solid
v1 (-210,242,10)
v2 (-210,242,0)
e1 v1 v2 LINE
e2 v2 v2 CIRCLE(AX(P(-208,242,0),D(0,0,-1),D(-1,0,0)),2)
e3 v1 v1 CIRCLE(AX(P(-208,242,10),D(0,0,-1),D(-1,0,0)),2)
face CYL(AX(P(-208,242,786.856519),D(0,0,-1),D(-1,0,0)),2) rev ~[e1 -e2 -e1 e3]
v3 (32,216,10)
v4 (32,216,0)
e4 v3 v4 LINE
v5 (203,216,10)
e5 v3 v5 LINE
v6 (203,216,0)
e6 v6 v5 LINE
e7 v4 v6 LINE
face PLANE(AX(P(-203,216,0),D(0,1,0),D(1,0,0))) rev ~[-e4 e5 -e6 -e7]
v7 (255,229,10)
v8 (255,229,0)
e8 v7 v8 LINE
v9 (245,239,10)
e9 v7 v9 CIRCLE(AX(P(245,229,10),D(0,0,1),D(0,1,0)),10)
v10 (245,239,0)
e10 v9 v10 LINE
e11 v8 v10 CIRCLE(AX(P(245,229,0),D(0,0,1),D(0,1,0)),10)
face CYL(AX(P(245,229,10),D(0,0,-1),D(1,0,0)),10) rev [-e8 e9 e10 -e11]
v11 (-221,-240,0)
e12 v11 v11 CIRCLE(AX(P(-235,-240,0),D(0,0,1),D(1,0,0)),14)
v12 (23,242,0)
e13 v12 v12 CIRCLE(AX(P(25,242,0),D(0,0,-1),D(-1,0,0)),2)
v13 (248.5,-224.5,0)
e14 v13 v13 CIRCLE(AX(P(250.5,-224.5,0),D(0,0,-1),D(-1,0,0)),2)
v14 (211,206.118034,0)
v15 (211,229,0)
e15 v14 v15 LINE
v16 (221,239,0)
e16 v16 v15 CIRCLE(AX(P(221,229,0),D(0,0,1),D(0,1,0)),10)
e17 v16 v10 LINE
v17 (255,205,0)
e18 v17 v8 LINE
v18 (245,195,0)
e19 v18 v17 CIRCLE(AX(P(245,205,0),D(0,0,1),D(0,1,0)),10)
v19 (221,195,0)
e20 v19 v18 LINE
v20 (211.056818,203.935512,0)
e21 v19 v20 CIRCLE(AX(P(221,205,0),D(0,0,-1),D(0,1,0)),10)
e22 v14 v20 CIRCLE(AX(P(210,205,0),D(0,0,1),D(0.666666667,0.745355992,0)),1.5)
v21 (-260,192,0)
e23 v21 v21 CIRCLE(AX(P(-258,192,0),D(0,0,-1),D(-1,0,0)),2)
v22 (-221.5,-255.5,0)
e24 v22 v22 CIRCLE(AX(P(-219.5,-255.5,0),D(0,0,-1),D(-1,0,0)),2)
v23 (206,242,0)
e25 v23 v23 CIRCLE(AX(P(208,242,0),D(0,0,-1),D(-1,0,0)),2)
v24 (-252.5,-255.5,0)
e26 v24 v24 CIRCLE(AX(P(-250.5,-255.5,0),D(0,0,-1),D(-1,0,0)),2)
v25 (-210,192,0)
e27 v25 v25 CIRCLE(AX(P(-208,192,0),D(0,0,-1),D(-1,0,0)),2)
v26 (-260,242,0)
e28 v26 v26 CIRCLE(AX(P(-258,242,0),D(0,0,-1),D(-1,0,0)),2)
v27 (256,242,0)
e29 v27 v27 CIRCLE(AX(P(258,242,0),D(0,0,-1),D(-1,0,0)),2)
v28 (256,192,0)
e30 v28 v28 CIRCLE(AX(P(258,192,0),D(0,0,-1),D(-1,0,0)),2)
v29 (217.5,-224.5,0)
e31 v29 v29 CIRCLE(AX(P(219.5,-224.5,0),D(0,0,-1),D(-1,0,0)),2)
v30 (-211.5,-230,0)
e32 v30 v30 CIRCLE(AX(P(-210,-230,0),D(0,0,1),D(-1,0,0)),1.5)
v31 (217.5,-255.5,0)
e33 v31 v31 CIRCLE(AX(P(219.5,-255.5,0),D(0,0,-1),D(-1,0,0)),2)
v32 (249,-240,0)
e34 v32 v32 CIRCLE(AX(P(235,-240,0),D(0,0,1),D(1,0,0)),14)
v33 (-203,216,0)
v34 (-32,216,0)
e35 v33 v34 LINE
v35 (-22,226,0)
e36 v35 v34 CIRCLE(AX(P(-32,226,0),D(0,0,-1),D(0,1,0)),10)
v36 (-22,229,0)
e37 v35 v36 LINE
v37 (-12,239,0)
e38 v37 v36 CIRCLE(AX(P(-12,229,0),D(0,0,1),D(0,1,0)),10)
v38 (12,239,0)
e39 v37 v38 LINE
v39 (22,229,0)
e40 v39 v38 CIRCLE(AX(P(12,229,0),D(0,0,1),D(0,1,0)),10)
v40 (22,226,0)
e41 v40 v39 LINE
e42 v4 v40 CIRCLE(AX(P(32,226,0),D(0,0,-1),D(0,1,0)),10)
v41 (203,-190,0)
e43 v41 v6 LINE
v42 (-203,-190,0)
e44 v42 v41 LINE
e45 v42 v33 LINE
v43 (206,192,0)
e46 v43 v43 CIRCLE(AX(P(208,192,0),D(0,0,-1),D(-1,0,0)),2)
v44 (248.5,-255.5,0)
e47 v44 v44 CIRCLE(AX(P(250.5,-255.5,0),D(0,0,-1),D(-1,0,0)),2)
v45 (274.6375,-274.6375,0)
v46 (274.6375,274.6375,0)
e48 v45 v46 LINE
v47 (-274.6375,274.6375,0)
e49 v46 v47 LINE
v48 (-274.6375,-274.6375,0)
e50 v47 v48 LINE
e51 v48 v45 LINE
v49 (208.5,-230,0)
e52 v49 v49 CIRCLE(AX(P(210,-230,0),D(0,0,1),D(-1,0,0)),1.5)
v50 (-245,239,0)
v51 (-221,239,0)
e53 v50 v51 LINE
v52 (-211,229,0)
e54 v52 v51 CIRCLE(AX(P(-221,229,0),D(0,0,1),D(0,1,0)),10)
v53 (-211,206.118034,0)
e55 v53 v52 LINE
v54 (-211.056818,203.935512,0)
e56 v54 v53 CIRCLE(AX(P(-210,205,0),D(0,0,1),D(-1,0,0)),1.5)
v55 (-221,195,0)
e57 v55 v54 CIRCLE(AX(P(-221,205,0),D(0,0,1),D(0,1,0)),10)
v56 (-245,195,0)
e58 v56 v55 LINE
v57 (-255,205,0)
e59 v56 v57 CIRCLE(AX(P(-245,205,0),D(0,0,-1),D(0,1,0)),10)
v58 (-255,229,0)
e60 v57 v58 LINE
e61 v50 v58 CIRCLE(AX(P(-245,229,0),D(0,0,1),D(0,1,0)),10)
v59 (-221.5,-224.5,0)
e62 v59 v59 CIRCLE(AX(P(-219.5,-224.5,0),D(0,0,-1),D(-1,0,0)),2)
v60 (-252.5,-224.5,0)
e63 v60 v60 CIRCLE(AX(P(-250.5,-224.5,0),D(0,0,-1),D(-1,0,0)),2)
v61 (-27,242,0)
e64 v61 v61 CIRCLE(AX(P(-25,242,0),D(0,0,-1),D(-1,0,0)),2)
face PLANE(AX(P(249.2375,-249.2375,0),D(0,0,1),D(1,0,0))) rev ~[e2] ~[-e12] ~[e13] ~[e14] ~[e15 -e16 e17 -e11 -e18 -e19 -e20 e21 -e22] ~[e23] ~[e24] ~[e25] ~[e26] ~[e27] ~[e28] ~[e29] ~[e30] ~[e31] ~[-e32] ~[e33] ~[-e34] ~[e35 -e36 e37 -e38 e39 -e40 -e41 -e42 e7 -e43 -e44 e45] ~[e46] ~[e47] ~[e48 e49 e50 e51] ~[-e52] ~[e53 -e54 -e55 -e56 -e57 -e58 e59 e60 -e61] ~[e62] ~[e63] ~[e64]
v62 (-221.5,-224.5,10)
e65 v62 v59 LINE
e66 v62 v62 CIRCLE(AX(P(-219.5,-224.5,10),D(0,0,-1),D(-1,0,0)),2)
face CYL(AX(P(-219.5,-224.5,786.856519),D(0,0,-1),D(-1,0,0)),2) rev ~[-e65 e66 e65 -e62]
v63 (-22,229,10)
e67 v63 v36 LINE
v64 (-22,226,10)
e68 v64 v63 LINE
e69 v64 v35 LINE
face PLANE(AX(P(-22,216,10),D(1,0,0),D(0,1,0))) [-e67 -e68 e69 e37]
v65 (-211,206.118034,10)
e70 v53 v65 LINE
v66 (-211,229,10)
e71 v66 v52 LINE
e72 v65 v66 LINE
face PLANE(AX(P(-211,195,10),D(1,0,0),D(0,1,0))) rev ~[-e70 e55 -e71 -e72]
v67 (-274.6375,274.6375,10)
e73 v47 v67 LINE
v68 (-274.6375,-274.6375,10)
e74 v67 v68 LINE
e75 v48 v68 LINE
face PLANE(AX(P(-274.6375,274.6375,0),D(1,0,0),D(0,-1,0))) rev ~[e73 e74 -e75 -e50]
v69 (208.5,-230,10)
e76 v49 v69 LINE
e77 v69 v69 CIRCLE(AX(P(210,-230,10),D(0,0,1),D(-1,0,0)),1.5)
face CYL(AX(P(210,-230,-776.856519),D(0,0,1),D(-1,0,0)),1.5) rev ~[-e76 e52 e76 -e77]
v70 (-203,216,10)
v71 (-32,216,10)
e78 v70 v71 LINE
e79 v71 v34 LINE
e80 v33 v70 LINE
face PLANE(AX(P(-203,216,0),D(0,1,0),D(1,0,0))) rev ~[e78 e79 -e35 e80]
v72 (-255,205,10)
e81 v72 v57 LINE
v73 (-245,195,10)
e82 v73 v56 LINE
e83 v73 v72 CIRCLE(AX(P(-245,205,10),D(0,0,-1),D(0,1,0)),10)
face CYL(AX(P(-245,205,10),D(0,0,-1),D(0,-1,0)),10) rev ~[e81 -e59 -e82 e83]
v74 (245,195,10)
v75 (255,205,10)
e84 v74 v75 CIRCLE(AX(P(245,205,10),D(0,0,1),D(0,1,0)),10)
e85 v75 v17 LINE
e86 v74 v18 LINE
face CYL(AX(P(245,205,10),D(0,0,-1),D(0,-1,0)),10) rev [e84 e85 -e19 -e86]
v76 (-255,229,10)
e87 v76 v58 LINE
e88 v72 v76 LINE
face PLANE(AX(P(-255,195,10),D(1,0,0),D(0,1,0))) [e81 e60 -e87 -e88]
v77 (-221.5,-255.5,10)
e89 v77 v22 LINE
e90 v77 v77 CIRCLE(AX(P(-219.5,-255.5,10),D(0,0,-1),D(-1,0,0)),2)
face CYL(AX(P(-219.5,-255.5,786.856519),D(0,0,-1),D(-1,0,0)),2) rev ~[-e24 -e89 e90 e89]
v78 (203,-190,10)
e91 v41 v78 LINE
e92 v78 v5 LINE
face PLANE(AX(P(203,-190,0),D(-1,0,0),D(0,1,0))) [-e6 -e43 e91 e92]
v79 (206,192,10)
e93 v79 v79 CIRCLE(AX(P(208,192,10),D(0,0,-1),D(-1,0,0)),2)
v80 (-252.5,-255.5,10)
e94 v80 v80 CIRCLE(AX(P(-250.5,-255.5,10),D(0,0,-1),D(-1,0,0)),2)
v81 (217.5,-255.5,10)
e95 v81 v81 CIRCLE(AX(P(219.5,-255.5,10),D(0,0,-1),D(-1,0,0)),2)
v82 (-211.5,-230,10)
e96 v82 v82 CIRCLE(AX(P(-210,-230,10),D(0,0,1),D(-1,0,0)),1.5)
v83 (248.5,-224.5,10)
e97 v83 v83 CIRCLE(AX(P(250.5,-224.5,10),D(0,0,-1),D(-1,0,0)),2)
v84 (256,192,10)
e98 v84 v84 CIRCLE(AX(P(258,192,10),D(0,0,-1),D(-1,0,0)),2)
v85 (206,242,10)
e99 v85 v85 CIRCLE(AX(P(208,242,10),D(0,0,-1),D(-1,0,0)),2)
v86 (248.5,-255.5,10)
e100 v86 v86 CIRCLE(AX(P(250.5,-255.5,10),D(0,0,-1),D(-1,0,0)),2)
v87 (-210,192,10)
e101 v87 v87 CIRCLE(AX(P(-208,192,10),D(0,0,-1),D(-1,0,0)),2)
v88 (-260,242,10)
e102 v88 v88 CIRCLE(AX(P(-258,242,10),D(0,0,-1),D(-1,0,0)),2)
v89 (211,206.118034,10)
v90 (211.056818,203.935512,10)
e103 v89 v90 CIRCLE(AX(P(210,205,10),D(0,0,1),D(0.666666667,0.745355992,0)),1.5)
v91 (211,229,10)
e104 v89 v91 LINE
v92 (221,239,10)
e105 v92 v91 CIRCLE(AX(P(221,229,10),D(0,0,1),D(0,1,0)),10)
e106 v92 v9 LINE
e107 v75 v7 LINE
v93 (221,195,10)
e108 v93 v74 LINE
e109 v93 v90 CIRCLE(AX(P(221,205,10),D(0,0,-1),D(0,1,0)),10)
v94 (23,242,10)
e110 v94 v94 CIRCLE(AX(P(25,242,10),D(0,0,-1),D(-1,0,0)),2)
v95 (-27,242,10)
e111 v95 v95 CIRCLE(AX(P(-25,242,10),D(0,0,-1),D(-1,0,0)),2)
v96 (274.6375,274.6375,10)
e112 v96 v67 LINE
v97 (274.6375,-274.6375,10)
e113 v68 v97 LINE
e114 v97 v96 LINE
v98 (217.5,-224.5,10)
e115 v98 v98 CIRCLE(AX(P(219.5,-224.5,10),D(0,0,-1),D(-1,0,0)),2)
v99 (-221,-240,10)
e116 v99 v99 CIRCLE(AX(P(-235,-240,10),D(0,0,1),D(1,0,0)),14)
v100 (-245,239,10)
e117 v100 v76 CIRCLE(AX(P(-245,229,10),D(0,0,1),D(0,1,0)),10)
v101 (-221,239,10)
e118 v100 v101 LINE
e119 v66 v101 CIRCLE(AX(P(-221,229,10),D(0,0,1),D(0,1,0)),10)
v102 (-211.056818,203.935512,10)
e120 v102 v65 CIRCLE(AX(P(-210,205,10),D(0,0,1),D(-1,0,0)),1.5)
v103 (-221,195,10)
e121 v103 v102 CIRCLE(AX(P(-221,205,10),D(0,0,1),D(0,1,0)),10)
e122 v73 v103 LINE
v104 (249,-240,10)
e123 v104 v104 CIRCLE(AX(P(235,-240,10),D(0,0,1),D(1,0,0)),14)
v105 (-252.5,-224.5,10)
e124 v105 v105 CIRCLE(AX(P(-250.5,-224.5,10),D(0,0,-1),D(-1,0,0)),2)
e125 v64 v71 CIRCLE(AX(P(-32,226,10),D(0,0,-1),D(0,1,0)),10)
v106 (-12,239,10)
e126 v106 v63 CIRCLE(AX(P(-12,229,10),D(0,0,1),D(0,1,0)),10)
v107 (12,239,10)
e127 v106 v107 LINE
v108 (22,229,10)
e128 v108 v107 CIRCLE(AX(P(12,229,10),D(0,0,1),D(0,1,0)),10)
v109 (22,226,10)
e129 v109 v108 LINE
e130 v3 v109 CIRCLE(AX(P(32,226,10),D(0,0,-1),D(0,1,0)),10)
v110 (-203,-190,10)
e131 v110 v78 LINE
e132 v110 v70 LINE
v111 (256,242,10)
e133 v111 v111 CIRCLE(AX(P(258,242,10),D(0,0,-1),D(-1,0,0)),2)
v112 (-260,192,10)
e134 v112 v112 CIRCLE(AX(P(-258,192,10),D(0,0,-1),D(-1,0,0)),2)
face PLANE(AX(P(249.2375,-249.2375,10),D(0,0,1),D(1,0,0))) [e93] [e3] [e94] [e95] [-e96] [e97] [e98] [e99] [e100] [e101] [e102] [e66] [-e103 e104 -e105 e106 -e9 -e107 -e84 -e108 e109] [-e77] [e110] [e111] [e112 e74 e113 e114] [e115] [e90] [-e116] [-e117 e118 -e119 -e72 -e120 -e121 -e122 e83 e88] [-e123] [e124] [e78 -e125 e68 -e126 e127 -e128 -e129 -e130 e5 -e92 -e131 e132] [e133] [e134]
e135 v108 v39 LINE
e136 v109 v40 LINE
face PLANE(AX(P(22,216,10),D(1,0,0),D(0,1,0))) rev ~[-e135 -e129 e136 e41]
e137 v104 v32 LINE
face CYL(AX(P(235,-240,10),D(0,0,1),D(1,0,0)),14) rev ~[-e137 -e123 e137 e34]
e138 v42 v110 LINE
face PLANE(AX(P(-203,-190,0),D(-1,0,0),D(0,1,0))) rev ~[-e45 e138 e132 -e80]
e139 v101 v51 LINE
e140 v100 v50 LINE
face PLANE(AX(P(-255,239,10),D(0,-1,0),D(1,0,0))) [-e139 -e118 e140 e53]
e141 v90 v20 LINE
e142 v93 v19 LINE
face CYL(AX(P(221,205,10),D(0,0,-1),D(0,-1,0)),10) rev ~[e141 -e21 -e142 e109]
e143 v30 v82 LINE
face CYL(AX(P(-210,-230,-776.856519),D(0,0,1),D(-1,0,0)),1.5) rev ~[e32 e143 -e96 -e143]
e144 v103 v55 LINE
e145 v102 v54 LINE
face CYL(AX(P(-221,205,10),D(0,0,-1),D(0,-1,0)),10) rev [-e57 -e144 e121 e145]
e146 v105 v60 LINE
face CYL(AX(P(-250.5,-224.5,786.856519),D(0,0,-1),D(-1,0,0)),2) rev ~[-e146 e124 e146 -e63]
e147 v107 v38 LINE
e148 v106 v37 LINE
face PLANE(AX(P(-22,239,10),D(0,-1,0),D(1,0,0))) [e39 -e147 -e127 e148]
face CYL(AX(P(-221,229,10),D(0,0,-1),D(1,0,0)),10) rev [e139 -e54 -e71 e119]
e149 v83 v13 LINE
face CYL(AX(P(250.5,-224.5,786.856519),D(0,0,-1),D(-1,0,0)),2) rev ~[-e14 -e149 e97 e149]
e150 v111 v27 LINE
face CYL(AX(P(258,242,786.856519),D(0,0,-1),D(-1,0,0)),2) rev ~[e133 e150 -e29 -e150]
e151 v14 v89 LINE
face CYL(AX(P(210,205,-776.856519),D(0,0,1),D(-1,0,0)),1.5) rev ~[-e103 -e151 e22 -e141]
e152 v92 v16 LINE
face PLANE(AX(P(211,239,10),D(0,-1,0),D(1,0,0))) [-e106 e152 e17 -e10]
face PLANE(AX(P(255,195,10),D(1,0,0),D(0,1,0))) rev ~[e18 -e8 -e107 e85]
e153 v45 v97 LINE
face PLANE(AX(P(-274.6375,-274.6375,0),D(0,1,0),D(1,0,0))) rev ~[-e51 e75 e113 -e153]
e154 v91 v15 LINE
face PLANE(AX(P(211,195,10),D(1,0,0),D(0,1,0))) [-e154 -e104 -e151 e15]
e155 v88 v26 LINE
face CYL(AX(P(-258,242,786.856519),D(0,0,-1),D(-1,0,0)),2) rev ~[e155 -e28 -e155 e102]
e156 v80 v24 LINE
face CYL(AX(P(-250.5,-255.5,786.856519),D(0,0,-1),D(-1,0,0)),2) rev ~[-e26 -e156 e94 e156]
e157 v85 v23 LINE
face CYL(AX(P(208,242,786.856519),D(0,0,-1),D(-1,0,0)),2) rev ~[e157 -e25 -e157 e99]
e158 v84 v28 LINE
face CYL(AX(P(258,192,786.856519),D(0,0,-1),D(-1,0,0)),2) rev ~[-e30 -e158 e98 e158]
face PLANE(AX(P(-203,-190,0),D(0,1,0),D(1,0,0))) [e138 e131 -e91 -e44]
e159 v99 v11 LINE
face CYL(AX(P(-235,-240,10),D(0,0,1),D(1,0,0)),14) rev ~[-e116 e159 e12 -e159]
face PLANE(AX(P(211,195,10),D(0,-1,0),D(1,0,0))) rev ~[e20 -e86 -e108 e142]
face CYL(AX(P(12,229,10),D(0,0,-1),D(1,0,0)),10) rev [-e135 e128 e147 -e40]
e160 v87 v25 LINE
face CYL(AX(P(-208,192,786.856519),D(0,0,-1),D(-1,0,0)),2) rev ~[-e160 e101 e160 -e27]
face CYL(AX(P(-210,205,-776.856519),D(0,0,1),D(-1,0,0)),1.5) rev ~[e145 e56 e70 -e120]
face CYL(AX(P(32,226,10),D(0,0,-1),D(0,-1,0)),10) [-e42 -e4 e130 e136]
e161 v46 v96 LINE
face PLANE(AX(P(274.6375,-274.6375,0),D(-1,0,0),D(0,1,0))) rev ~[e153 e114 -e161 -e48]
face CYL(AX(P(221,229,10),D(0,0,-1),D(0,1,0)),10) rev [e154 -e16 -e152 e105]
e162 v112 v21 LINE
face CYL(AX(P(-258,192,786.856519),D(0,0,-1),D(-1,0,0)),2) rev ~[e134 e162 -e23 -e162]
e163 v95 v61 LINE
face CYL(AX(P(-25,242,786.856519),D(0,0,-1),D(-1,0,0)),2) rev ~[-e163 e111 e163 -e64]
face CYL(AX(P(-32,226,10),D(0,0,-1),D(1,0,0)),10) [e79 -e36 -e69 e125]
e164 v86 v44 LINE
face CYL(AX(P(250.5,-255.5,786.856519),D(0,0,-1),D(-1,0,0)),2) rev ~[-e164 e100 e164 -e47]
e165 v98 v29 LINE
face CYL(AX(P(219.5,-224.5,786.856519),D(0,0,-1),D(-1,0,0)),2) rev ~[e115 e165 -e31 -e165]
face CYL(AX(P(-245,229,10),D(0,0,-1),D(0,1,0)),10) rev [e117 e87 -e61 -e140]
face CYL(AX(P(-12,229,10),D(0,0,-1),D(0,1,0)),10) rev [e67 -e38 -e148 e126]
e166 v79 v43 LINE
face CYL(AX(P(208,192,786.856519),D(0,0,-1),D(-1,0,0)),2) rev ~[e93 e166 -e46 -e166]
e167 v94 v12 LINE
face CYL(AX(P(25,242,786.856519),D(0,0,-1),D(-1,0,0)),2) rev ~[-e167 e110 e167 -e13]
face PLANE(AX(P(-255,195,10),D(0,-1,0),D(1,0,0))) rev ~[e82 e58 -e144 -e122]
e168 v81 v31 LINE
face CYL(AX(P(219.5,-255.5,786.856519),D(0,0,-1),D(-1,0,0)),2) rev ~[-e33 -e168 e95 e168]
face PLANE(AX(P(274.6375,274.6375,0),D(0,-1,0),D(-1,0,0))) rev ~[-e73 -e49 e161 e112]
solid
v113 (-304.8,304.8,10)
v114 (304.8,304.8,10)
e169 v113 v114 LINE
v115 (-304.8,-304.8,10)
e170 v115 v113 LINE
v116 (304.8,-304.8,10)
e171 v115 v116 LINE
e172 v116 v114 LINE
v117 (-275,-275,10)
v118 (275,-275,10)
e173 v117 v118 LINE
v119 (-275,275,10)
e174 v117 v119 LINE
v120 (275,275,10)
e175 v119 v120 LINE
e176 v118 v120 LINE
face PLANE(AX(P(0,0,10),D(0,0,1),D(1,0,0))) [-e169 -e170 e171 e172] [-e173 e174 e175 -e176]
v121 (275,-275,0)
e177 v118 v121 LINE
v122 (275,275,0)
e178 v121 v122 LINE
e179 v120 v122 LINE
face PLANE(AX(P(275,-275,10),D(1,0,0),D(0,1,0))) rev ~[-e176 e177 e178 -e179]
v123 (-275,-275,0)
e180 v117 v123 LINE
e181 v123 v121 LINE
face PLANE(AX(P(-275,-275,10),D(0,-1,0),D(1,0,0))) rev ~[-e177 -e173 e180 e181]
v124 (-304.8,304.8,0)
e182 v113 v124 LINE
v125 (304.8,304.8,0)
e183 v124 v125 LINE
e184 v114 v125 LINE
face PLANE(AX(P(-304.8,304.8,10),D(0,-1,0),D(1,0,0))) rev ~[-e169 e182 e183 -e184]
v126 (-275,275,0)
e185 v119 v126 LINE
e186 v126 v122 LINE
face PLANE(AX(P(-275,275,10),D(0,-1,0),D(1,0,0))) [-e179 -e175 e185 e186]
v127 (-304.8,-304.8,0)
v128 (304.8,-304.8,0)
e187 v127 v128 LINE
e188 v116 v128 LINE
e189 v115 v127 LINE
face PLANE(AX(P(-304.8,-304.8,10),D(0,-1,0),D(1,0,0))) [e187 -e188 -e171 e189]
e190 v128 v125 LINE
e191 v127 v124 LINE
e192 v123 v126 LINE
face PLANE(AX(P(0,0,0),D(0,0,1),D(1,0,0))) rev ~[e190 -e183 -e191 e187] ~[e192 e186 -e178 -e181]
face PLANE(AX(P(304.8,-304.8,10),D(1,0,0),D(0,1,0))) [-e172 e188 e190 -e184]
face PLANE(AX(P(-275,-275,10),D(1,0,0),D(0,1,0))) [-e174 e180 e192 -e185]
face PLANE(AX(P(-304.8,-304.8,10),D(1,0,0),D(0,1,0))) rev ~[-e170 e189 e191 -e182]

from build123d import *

# Parameters (mm, degrees)
F0_W     = 50.8
F0_H     = 50.8
F0_W_2   = 406
F0_H_2   = 406
F1_DEPTH = 10
F3_W     = 44
F3_H     = 44
F3_H_2   = 23
F3_R     = 14
F4_DEPTH = 25
F5_W     = 609.6
F5_H     = 609.6
F5_W_2   = 550
F5_H_2   = 550
F6_DEPTH = 10
F7_R     = 10
F8_D     = 4
F9_D     = 3


# Not quite as in the source:
# - a feature names something its author has since deleted; it is built from what else it names


with BuildPart() as f1:
    # F0 (on Top) → F1 (new body)
    with BuildSketch(Plane.XY):
        with Locations((249.2375, -249.2375)):
            Rectangle(F0_W, F0_H)
        Polygon((-223.8375, -274.6375), (223.8375, -274.6375), (223.8375, -223.8375), (274.6375, -223.8375), (274.6375, 223.8375), (223.8375, 223.8375), (223.8375, 274.6375), (-223.8375, 274.6375), (-223.8375, 223.8375), (-274.6375, 223.8375), (-274.6375, -223.8375), (-223.8375, -223.8375), align=None)
        with Locations((0, 13)):
            Rectangle(F0_W_2, F0_H_2, mode=Mode.SUBTRACT)
        with Locations((-249.2375, -249.2375)):
            Rectangle(F0_W, F0_H)
        with Locations((249.2375, 249.2375)):
            Rectangle(F0_W, F0_H)
        with Locations((-249.2375, 249.2375)):
            Rectangle(F0_W, F0_H)
    extrude(amount=F1_DEPTH)

    # F3 (on face) → F4 (cut)
    with BuildSketch(Plane.XY.offset(10)):
        with Locations((-233, 217)):
            Rectangle(F3_W, F3_H)
        with Locations((233, 217)):
            Rectangle(F3_W, F3_H)
        with Locations((0, 227.5)):
            Rectangle(F3_W, F3_H_2)
        with Locations((-235, -240)):
            Circle(F3_R)
        with Locations((235, -240)):
            Circle(F3_R)
    extrude(amount=-F4_DEPTH, mode=Mode.SUBTRACT)

    # F7
    f7_edges = [f1.edges().sort_by_distance(p)[0] for p in [
        (255, 195, 5),
        (255, 239, 5),
        (-22, 239, 5),
        (22, 239, 5),
        (-255, 195, 5),
        (-211, 195, 5),
        (-255, 239, 5),
        (-211, 239, 5),
        (211, 195, 5),
        (211, 239, 5),
        (22, 216, 5),
        (-22, 216, 5),
    ]]
    fillet(f7_edges, radius=F7_R)

    # F8 (through all)
    with Locations(Plane.XY.offset(10)):
        with Locations((-258, 192), (-258, 242), (-208, 242), (-208, 192), (25, 192), (25, 242), (-25, 242), (208, 192), (258, 242), (208, 242), (-25, 192), (258, 192), (-250.5, -255.5), (-250.5, -224.5), (-219.5, -224.5), (-219.5, -255.5), (250.5, -255.5), (219.5, -224.5), (219.5, -255.5), (250.5, -224.5)):
            Hole(F8_D / 2)

    # F9 (through all)
    with Locations(Plane(origin=(0, 0, 0), x_dir=(1, 0, 0), z_dir=(0, 0, -1))):
        with Locations((-210, -205), (210, -205), (210, 230), (-210, 230)):
            Hole(F9_D / 2)


with BuildPart() as f6:
    # F5 (on face) → F6 (new body)
    with BuildSketch(Plane.XY.offset(10)):
        Rectangle(F5_W, F5_H)
        Rectangle(F5_W_2, F5_H_2, mode=Mode.SUBTRACT)
    extrude(amount=-F6_DEPTH)


solid = Compound([f1.part, f6.part])
